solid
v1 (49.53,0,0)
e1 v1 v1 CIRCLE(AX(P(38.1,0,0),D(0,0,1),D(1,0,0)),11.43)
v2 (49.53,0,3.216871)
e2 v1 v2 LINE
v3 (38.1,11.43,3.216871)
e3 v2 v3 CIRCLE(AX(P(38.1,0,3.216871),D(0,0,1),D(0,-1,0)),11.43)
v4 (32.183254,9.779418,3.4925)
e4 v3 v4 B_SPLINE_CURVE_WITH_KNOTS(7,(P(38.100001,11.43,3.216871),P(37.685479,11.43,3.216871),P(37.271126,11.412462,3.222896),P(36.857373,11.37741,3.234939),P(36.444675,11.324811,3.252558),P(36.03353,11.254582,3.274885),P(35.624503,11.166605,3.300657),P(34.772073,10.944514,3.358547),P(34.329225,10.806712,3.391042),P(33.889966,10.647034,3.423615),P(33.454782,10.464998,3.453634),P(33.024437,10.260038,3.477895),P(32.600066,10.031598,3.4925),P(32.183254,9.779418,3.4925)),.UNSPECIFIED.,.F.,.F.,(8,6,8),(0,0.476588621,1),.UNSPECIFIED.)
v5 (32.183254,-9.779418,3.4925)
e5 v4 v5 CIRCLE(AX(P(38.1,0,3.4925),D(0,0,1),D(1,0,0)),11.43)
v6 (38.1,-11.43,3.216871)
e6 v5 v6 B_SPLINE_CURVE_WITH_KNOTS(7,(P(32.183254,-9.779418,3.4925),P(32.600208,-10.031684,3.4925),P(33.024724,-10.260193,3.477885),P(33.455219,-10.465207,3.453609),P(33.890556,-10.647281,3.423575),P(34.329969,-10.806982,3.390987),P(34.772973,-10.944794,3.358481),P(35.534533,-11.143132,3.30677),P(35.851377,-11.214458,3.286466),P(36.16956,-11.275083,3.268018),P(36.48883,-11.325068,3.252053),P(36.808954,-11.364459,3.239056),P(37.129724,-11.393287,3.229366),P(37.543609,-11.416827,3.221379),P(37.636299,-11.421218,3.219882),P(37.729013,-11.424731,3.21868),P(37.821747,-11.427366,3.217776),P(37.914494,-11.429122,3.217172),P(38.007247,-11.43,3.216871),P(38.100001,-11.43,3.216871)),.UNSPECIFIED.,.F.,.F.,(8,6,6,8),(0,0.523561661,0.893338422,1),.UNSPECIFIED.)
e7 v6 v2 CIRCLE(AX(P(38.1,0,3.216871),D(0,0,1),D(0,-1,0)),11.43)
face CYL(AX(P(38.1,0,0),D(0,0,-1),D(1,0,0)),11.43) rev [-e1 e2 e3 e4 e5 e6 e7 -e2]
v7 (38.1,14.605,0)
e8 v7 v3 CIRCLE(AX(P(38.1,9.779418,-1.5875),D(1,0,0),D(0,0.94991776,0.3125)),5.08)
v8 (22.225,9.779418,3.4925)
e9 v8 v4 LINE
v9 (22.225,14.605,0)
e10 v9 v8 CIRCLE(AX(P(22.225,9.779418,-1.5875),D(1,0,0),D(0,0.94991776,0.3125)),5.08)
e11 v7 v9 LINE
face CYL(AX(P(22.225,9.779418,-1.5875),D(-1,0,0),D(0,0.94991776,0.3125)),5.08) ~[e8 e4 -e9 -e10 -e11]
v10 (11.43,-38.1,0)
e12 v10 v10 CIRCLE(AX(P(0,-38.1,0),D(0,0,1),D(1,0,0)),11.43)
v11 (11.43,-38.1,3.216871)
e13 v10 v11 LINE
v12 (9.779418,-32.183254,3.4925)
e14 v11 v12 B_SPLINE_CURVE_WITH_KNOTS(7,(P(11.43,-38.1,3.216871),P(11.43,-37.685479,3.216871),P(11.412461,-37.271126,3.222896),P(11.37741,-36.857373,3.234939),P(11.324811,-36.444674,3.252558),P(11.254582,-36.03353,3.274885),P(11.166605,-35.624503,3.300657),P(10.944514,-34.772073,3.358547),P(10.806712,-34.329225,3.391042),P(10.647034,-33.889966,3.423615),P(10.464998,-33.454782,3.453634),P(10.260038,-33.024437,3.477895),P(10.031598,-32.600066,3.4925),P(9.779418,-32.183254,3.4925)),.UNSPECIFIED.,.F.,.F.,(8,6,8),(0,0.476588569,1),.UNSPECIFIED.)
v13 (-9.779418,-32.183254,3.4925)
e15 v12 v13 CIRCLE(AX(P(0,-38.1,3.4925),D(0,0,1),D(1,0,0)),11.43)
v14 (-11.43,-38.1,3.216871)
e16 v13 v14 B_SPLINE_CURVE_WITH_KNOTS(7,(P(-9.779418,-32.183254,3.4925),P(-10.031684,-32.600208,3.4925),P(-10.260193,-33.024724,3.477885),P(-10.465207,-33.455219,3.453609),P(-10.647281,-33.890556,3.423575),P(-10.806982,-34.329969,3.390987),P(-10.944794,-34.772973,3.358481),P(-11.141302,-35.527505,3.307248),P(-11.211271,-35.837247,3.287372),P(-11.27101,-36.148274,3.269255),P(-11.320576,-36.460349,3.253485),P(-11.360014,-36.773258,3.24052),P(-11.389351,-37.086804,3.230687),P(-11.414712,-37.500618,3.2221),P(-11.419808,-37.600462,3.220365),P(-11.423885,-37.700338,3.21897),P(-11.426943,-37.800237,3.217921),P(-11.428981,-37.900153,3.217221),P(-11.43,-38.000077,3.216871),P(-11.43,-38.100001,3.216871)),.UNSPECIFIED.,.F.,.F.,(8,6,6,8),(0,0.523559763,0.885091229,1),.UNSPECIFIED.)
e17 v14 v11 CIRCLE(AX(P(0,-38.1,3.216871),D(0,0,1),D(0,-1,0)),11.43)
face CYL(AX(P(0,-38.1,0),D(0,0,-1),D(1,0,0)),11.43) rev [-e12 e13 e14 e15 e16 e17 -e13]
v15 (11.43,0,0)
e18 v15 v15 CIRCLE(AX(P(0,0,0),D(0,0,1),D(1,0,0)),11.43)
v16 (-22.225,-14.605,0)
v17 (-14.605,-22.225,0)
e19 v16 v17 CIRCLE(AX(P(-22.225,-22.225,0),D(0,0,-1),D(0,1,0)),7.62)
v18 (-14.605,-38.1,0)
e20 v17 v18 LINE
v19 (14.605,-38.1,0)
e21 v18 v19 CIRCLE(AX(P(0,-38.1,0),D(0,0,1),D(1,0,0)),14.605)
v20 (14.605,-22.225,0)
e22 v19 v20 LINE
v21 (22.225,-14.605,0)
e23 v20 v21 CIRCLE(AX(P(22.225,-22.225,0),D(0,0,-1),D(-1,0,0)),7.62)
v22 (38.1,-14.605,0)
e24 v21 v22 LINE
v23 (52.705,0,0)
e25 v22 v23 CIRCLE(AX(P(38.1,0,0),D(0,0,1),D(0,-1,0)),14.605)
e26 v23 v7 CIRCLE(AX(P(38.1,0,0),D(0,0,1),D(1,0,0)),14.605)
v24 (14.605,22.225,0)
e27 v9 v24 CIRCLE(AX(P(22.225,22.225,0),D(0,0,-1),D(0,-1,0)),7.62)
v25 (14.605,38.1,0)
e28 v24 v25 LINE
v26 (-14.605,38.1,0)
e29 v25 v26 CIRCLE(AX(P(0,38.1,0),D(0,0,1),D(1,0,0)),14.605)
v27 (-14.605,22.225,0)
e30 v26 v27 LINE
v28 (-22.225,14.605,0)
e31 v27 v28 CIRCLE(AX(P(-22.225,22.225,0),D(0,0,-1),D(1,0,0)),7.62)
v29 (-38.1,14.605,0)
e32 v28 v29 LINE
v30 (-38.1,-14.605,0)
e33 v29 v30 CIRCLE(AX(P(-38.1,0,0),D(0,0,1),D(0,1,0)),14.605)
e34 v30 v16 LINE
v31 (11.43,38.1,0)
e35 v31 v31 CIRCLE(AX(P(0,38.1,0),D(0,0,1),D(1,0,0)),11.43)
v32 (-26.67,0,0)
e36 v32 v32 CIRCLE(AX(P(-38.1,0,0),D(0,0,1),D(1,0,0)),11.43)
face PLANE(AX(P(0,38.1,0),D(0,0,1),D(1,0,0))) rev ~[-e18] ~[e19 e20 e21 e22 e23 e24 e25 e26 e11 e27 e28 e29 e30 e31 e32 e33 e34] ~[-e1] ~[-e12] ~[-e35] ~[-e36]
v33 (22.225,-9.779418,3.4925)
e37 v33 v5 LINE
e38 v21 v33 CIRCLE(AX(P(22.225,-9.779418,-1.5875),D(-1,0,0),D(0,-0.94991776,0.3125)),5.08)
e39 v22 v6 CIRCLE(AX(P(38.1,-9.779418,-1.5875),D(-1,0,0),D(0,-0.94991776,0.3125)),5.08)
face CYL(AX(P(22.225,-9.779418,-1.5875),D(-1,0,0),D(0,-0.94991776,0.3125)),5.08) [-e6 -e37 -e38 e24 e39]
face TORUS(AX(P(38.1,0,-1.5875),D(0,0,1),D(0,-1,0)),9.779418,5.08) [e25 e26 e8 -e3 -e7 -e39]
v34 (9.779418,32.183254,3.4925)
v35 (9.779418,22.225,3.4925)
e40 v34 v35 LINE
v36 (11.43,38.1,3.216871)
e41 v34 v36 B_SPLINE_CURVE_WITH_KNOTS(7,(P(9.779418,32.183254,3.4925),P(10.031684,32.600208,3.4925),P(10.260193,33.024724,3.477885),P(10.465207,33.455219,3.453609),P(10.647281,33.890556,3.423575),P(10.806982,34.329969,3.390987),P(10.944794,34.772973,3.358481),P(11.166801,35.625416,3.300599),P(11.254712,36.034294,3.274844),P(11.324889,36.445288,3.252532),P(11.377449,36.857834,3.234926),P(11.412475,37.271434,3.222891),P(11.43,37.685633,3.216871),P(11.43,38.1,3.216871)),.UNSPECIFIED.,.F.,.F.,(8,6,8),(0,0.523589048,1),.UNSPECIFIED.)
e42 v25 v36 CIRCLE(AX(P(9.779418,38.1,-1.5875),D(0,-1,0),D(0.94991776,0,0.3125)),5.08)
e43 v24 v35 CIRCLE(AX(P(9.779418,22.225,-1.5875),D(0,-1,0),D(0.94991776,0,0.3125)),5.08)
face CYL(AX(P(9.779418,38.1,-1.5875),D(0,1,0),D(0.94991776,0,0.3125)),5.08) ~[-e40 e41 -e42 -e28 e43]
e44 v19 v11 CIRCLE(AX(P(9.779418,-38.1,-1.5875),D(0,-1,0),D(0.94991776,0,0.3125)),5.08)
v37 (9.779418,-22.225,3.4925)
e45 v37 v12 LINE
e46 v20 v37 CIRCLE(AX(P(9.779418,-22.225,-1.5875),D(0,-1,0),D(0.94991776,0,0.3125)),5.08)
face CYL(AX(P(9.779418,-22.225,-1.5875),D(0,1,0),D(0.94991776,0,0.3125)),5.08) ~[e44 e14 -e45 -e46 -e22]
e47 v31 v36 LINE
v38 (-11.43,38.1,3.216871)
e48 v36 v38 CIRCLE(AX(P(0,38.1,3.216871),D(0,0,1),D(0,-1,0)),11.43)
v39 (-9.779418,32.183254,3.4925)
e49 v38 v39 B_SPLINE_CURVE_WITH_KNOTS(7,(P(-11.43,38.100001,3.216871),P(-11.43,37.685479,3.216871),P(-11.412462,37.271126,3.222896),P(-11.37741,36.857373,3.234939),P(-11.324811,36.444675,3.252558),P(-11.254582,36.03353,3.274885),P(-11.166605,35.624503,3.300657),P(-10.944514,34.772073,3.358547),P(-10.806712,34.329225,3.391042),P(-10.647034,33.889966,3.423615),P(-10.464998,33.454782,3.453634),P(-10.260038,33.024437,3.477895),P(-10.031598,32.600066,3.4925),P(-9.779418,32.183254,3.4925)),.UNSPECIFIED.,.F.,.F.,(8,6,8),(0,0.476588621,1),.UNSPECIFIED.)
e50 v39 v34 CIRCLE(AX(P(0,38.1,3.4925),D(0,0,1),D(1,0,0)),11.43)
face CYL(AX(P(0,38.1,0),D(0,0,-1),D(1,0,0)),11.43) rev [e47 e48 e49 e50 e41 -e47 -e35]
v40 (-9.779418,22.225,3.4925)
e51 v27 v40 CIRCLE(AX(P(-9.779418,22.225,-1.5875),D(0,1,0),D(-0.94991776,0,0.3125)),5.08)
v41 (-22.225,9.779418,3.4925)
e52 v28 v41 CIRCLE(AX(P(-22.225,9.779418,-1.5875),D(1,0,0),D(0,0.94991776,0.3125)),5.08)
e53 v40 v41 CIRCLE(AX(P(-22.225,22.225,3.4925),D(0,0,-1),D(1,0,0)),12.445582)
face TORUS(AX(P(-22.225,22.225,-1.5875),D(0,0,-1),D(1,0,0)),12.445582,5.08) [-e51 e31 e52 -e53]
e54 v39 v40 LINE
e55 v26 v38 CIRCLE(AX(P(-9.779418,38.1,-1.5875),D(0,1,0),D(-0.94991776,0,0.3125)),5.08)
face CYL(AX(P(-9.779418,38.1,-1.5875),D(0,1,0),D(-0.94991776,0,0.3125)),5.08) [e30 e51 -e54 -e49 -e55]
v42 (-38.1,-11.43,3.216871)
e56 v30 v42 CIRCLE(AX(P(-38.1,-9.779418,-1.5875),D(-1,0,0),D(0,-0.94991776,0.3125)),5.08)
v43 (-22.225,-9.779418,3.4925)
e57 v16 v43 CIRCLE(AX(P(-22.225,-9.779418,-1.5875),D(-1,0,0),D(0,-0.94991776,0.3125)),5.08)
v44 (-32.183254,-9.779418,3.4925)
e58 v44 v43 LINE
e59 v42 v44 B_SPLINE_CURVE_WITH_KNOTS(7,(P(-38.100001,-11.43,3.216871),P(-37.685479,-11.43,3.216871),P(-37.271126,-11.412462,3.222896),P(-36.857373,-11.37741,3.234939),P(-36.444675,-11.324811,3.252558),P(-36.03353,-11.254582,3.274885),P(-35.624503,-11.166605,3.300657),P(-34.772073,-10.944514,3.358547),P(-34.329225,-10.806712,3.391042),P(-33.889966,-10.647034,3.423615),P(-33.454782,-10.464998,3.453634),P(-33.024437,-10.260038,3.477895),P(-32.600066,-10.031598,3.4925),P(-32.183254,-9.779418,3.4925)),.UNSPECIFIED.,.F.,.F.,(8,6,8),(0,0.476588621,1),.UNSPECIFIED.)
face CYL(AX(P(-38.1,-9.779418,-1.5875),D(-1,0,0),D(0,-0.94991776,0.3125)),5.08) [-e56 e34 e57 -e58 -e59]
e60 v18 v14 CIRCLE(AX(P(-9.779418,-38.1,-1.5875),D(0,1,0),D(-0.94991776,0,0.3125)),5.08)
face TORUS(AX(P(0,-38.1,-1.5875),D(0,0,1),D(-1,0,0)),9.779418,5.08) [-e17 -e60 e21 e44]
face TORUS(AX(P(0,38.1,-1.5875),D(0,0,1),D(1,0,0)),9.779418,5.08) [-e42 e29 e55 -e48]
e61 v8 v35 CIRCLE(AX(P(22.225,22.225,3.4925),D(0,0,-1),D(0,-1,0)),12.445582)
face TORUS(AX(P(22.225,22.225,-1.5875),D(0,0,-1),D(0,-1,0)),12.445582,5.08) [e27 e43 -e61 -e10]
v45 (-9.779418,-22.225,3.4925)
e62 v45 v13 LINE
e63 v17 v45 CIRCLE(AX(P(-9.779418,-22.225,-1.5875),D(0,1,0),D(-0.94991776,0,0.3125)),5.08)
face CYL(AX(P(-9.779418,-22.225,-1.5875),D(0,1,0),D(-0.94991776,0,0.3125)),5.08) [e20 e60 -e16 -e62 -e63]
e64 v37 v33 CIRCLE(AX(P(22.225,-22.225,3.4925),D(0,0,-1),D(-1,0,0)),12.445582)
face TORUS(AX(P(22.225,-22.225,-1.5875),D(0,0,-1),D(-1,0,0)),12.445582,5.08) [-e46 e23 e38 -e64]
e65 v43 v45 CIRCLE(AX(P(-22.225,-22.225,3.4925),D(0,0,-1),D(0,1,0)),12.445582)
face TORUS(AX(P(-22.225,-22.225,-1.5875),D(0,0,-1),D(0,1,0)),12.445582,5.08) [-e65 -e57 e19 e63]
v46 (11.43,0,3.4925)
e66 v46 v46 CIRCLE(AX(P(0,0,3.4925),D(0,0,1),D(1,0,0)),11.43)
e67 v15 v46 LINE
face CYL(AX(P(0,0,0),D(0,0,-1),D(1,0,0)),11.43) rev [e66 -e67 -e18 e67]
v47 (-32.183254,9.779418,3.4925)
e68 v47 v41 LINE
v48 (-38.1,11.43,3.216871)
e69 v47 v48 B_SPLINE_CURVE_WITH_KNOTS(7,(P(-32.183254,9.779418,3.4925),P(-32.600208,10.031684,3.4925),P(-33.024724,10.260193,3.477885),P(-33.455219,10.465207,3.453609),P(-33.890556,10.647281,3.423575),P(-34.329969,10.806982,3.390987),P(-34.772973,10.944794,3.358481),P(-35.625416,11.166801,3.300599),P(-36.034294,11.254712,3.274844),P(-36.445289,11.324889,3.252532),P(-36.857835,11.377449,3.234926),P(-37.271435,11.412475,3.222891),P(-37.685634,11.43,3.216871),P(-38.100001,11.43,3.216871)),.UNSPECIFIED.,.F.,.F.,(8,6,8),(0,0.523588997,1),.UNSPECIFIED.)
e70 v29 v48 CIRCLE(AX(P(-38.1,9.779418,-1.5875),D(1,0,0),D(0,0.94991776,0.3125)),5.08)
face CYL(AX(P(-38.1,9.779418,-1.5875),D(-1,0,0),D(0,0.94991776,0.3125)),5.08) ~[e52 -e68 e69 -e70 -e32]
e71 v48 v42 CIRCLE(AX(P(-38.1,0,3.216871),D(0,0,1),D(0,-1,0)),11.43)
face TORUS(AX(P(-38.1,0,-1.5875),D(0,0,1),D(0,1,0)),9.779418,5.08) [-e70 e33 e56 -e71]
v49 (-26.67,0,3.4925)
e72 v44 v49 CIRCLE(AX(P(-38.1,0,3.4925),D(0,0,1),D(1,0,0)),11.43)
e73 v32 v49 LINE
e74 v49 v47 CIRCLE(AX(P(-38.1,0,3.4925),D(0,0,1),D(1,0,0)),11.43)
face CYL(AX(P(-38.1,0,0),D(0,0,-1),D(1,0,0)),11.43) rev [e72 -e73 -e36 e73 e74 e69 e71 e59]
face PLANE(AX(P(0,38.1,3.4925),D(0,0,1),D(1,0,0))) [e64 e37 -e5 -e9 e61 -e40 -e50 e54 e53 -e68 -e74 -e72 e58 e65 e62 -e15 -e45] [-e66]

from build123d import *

# Parameters (mm, degrees)
F0_R         = 11.43
F0_R_2       = 14.605
F1_DEPTH     = 3.4925
F2_T1_DEPTH  = 15.875
F2_T3_DEPTH  = 15.875
F2_T5_DEPTH  = 15.875
F2_T7_DEPTH  = 15.875
F2_T10_ANGLE = 180
F2_T12_ANGLE = 90
F2_T14_ANGLE = 180
F2_T16_ANGLE = 90
F2_T18_ANGLE = 180
F2_T20_ANGLE = 90
F2_T22_ANGLE = 180
F2_T24_ANGLE = 90


# Not quite as in the source:
# - a fillet or chamfer that OpenCascade refuses, or shapes differently, is made with other operations: its cross-section is extruded or revolved along the edge and cut away or added


with BuildPart() as f1:
    # F0 (on Top) → F1 (new body)
    with BuildSketch(Plane.XY):
        with BuildLine():
            ThreePointArc((-14.605, 38.1), (0, 23.495), (14.605, 38.1))
            ThreePointArc((14.605, 38.1), (0, 52.705), (-14.605, 38.1))
        make_face()
        with Locations((0, 38.1)):
            Circle(F0_R, mode=Mode.SUBTRACT)
        with BuildLine():
            Line((14.605, 22.225), (14.605, 38.1))
            ThreePointArc((14.605, 38.1), (0, 23.495), (-14.605, 38.1))
            Line((-14.605, 38.1), (-14.605, 22.225))
            ThreePointArc((-14.605, 22.225), (-16.8368463274, 16.8368463274), (-22.225, 14.605))
            Line((-22.225, 14.605), (-38.1, 14.605))
            ThreePointArc((-38.1, 14.605), (-27.7727054608, 10.3272945392), (-23.495, 0))
            ThreePointArc((-23.495, 0), (-27.7727054608, -10.3272945392), (-38.1, -14.605))
            Line((-38.1, -14.605), (-22.225, -14.605))
            ThreePointArc((-22.225, -14.605), (-16.8368463274, -16.8368463274), (-14.605, -22.225))
            Line((-14.605, -22.225), (-14.605, -38.1))
            ThreePointArc((-14.605, -38.1), (0, -23.495), (14.605, -38.1))
            Line((14.605, -38.1), (14.605, -22.225))
            ThreePointArc((14.605, -22.225), (16.8368463274, -16.8368463274), (22.225, -14.605))
            Line((22.225, -14.605), (38.1, -14.605))
            ThreePointArc((38.1, -14.605), (23.495, 0), (38.1, 14.605))
            Line((38.1, 14.605), (22.225, 14.605))
            ThreePointArc((22.225, 14.605), (16.8368463274, 16.8368463274), (14.605, 22.225))
        make_face()
        Circle(F0_R_2, mode=Mode.SUBTRACT)
        with BuildLine():
            ThreePointArc((52.705, 0), (48.4272945392, 10.3272945392), (38.1, 14.605))
            ThreePointArc((38.1, 14.605), (23.495, 0), (38.1, -14.605))
            ThreePointArc((38.1, -14.605), (48.4272945392, -10.3272945392), (52.705, 0))
        make_face()
        with Locations((38.1, 0)):
            Circle(F0_R, mode=Mode.SUBTRACT)
        with BuildLine():
            ThreePointArc((-23.495, 0), (-27.7727054608, 10.3272945392), (-38.1, 14.605))
            ThreePointArc((-38.1, 14.605), (-52.705, 0), (-38.1, -14.605))
            ThreePointArc((-38.1, -14.605), (-27.7727054608, -10.3272945392), (-23.495, 0))
        make_face()
        with Locations((-38.1, 0)):
            Circle(F0_R, mode=Mode.SUBTRACT)
        with BuildLine():
            ThreePointArc((-14.605, -38.1), (0, -52.705), (14.605, -38.1))
            ThreePointArc((14.605, -38.1), (0, -23.495), (-14.605, -38.1))
        make_face()
        with Locations((0, -38.1)):
            Circle(F0_R, mode=Mode.SUBTRACT)
        Circle(F0_R_2)
        Circle(F0_R, mode=Mode.SUBTRACT)
    extrude(amount=F1_DEPTH)

    # F2: fillet of radius 5.08 on 1 edges, made by hand

    # F2_s2 → F2_t1 (cut)
    with BuildSketch(Plane.XZ.offset(22.225)):
        with BuildLine():
            ThreePointArc((-14.605, 0), (-12.7578317887, 2.5277703435), (-9.7794177812, 3.4925))
            Line((-9.7794177812, 3.4925), (-14.605, 3.4925))
            Line((-14.605, 3.4925), (-14.605, 0))
        make_face()
        with BuildLine():
            ThreePointArc((14.605, 0), (12.7578317887, 2.5277703435), (9.7794177812, 3.4925))
            Line((9.7794177812, 3.4925), (14.605, 3.4925))
            Line((14.605, 3.4925), (14.605, 0))
        make_face()
    extrude(amount=F2_T1_DEPTH, mode=Mode.SUBTRACT)

    # F2_s4 → F2_t3 (cut)
    with BuildSketch(Plane.YZ.offset(22.225)):
        with BuildLine():
            ThreePointArc((-14.605, 0), (-12.7578317887, 2.5277703435), (-9.7794177812, 3.4925))
            Line((-9.7794177812, 3.4925), (-14.605, 3.4925))
            Line((-14.605, 3.4925), (-14.605, 0))
        make_face()
        with BuildLine():
            ThreePointArc((14.605, 0), (12.7578317887, 2.5277703435), (9.7794177812, 3.4925))
            Line((9.7794177812, 3.4925), (14.605, 3.4925))
            Line((14.605, 3.4925), (14.605, 0))
        make_face()
    extrude(amount=F2_T3_DEPTH, mode=Mode.SUBTRACT)

    # F2_s6 → F2_t5 (cut)
    with BuildSketch(Plane.XZ.offset(-38.1)):
        with BuildLine():
            ThreePointArc((14.605, 0), (12.7578317887, 2.5277703435), (9.7794177812, 3.4925))
            Line((9.7794177812, 3.4925), (14.605, 3.4925))
            Line((14.605, 3.4925), (14.605, 0))
        make_face()
        with BuildLine():
            ThreePointArc((-14.605, 0), (-12.7578317887, 2.5277703435), (-9.7794177812, 3.4925))
            Line((-9.7794177812, 3.4925), (-14.605, 3.4925))
            Line((-14.605, 3.4925), (-14.605, 0))
        make_face()
    extrude(amount=F2_T5_DEPTH, mode=Mode.SUBTRACT)

    # F2_s8 → F2_t7 (cut)
    with BuildSketch(Plane.YZ.offset(-38.1)):
        with BuildLine():
            ThreePointArc((14.605, 0), (12.7578317887, 2.5277703435), (9.7794177812, 3.4925))
            Line((9.7794177812, 3.4925), (14.605, 3.4925))
            Line((14.605, 3.4925), (14.605, 0))
        make_face()
        with BuildLine():
            ThreePointArc((-14.605, 0), (-12.7578317887, 2.5277703435), (-9.7794177812, 3.4925))
            Line((-9.7794177812, 3.4925), (-14.605, 3.4925))
            Line((-14.605, 3.4925), (-14.605, 0))
        make_face()
    extrude(amount=F2_T7_DEPTH, mode=Mode.SUBTRACT)

    # F2_s9 → F2_t10 (revolve, cut)
    with BuildSketch(Plane.XZ.offset(38.1)):
        with BuildLine():
            ThreePointArc((-14.605, 0), (-12.7578317887, 2.5277703435), (-9.7794177812, 3.4925))
            Line((-9.7794177812, 3.4925), (-14.605, 3.4925))
            Line((-14.605, 3.4925), (-14.605, 0))
        make_face()
    revolve(axis=Axis((0, -38.1, 3.4925), (0, 0, 1)), revolution_arc=F2_T10_ANGLE, mode=Mode.SUBTRACT)

    # F2_s11 → F2_t12 (revolve, cut)
    with BuildSketch(Plane.XZ.offset(22.225)):
        with BuildLine():
            ThreePointArc((14.605, 0), (12.7578317887, 2.5277703435), (9.7794177812, 3.4925))
            Line((9.7794177812, 3.4925), (14.605, 3.4925))
            Line((14.605, 3.4925), (14.605, 0))
        make_face()
    revolve(axis=Axis((22.225, -22.225, 3.4925), (0, 0, -1)), revolution_arc=F2_T12_ANGLE, mode=Mode.SUBTRACT)

    # F2_s13 → F2_t14 (revolve, cut)
    with BuildSketch(Plane.YZ.offset(38.1)):
        with BuildLine():
            ThreePointArc((-14.605, 0), (-12.7578317887, 2.5277703435), (-9.7794177812, 3.4925))
            Line((-9.7794177812, 3.4925), (-14.605, 3.4925))
            Line((-14.605, 3.4925), (-14.605, 0))
        make_face()
    revolve(axis=Axis((38.1, 0, 3.4925), (0, 0, 1)), revolution_arc=F2_T14_ANGLE, mode=Mode.SUBTRACT)

    # F2_s15 → F2_t16 (revolve, cut)
    with BuildSketch(Plane.YZ.offset(22.225)):
        with BuildLine():
            ThreePointArc((14.605, 0), (12.7578317887, 2.5277703435), (9.7794177812, 3.4925))
            Line((9.7794177812, 3.4925), (14.605, 3.4925))
            Line((14.605, 3.4925), (14.605, 0))
        make_face()
    revolve(axis=Axis((22.225, 22.225, 3.4925), (0, 0, -1)), revolution_arc=F2_T16_ANGLE, mode=Mode.SUBTRACT)

    # F2_s17 → F2_t18 (revolve, cut)
    with BuildSketch(Plane.XZ.offset(-38.1)):
        with BuildLine():
            ThreePointArc((14.605, 0), (12.7578317887, 2.5277703435), (9.7794177812, 3.4925))
            Line((9.7794177812, 3.4925), (14.605, 3.4925))
            Line((14.605, 3.4925), (14.605, 0))
        make_face()
    revolve(axis=Axis((0, 38.1, 3.4925), (0, 0, 1)), revolution_arc=F2_T18_ANGLE, mode=Mode.SUBTRACT)

    # F2_s19 → F2_t20 (revolve, cut)
    with BuildSketch(Plane.XZ.offset(-22.225)):
        with BuildLine():
            ThreePointArc((-14.605, 0), (-12.7578317887, 2.5277703435), (-9.7794177812, 3.4925))
            Line((-9.7794177812, 3.4925), (-14.605, 3.4925))
            Line((-14.605, 3.4925), (-14.605, 0))
        make_face()
    revolve(axis=Axis((-22.225, 22.225, 3.4925), (0, 0, -1)), revolution_arc=F2_T20_ANGLE, mode=Mode.SUBTRACT)

    # F2_s21 → F2_t22 (revolve, cut)
    with BuildSketch(Plane.YZ.offset(-38.1)):
        with BuildLine():
            ThreePointArc((14.605, 0), (12.7578317887, 2.5277703435), (9.7794177812, 3.4925))
            Line((9.7794177812, 3.4925), (14.605, 3.4925))
            Line((14.605, 3.4925), (14.605, 0))
        make_face()
    revolve(axis=Axis((-38.1, 0, 3.4925), (0, 0, 1)), revolution_arc=F2_T22_ANGLE, mode=Mode.SUBTRACT)

    # F2_s23 → F2_t24 (revolve, cut)
    with BuildSketch(Plane.YZ.offset(-22.225)):
        with BuildLine():
            ThreePointArc((-14.605, 0), (-12.7578317887, 2.5277703435), (-9.7794177812, 3.4925))
            Line((-9.7794177812, 3.4925), (-14.605, 3.4925))
            Line((-14.605, 3.4925), (-14.605, 0))
        make_face()
    revolve(axis=Axis((-22.225, -22.225, 3.4925), (0, 0, -1)), revolution_arc=F2_T24_ANGLE, mode=Mode.SUBTRACT)


solid = f1.part
